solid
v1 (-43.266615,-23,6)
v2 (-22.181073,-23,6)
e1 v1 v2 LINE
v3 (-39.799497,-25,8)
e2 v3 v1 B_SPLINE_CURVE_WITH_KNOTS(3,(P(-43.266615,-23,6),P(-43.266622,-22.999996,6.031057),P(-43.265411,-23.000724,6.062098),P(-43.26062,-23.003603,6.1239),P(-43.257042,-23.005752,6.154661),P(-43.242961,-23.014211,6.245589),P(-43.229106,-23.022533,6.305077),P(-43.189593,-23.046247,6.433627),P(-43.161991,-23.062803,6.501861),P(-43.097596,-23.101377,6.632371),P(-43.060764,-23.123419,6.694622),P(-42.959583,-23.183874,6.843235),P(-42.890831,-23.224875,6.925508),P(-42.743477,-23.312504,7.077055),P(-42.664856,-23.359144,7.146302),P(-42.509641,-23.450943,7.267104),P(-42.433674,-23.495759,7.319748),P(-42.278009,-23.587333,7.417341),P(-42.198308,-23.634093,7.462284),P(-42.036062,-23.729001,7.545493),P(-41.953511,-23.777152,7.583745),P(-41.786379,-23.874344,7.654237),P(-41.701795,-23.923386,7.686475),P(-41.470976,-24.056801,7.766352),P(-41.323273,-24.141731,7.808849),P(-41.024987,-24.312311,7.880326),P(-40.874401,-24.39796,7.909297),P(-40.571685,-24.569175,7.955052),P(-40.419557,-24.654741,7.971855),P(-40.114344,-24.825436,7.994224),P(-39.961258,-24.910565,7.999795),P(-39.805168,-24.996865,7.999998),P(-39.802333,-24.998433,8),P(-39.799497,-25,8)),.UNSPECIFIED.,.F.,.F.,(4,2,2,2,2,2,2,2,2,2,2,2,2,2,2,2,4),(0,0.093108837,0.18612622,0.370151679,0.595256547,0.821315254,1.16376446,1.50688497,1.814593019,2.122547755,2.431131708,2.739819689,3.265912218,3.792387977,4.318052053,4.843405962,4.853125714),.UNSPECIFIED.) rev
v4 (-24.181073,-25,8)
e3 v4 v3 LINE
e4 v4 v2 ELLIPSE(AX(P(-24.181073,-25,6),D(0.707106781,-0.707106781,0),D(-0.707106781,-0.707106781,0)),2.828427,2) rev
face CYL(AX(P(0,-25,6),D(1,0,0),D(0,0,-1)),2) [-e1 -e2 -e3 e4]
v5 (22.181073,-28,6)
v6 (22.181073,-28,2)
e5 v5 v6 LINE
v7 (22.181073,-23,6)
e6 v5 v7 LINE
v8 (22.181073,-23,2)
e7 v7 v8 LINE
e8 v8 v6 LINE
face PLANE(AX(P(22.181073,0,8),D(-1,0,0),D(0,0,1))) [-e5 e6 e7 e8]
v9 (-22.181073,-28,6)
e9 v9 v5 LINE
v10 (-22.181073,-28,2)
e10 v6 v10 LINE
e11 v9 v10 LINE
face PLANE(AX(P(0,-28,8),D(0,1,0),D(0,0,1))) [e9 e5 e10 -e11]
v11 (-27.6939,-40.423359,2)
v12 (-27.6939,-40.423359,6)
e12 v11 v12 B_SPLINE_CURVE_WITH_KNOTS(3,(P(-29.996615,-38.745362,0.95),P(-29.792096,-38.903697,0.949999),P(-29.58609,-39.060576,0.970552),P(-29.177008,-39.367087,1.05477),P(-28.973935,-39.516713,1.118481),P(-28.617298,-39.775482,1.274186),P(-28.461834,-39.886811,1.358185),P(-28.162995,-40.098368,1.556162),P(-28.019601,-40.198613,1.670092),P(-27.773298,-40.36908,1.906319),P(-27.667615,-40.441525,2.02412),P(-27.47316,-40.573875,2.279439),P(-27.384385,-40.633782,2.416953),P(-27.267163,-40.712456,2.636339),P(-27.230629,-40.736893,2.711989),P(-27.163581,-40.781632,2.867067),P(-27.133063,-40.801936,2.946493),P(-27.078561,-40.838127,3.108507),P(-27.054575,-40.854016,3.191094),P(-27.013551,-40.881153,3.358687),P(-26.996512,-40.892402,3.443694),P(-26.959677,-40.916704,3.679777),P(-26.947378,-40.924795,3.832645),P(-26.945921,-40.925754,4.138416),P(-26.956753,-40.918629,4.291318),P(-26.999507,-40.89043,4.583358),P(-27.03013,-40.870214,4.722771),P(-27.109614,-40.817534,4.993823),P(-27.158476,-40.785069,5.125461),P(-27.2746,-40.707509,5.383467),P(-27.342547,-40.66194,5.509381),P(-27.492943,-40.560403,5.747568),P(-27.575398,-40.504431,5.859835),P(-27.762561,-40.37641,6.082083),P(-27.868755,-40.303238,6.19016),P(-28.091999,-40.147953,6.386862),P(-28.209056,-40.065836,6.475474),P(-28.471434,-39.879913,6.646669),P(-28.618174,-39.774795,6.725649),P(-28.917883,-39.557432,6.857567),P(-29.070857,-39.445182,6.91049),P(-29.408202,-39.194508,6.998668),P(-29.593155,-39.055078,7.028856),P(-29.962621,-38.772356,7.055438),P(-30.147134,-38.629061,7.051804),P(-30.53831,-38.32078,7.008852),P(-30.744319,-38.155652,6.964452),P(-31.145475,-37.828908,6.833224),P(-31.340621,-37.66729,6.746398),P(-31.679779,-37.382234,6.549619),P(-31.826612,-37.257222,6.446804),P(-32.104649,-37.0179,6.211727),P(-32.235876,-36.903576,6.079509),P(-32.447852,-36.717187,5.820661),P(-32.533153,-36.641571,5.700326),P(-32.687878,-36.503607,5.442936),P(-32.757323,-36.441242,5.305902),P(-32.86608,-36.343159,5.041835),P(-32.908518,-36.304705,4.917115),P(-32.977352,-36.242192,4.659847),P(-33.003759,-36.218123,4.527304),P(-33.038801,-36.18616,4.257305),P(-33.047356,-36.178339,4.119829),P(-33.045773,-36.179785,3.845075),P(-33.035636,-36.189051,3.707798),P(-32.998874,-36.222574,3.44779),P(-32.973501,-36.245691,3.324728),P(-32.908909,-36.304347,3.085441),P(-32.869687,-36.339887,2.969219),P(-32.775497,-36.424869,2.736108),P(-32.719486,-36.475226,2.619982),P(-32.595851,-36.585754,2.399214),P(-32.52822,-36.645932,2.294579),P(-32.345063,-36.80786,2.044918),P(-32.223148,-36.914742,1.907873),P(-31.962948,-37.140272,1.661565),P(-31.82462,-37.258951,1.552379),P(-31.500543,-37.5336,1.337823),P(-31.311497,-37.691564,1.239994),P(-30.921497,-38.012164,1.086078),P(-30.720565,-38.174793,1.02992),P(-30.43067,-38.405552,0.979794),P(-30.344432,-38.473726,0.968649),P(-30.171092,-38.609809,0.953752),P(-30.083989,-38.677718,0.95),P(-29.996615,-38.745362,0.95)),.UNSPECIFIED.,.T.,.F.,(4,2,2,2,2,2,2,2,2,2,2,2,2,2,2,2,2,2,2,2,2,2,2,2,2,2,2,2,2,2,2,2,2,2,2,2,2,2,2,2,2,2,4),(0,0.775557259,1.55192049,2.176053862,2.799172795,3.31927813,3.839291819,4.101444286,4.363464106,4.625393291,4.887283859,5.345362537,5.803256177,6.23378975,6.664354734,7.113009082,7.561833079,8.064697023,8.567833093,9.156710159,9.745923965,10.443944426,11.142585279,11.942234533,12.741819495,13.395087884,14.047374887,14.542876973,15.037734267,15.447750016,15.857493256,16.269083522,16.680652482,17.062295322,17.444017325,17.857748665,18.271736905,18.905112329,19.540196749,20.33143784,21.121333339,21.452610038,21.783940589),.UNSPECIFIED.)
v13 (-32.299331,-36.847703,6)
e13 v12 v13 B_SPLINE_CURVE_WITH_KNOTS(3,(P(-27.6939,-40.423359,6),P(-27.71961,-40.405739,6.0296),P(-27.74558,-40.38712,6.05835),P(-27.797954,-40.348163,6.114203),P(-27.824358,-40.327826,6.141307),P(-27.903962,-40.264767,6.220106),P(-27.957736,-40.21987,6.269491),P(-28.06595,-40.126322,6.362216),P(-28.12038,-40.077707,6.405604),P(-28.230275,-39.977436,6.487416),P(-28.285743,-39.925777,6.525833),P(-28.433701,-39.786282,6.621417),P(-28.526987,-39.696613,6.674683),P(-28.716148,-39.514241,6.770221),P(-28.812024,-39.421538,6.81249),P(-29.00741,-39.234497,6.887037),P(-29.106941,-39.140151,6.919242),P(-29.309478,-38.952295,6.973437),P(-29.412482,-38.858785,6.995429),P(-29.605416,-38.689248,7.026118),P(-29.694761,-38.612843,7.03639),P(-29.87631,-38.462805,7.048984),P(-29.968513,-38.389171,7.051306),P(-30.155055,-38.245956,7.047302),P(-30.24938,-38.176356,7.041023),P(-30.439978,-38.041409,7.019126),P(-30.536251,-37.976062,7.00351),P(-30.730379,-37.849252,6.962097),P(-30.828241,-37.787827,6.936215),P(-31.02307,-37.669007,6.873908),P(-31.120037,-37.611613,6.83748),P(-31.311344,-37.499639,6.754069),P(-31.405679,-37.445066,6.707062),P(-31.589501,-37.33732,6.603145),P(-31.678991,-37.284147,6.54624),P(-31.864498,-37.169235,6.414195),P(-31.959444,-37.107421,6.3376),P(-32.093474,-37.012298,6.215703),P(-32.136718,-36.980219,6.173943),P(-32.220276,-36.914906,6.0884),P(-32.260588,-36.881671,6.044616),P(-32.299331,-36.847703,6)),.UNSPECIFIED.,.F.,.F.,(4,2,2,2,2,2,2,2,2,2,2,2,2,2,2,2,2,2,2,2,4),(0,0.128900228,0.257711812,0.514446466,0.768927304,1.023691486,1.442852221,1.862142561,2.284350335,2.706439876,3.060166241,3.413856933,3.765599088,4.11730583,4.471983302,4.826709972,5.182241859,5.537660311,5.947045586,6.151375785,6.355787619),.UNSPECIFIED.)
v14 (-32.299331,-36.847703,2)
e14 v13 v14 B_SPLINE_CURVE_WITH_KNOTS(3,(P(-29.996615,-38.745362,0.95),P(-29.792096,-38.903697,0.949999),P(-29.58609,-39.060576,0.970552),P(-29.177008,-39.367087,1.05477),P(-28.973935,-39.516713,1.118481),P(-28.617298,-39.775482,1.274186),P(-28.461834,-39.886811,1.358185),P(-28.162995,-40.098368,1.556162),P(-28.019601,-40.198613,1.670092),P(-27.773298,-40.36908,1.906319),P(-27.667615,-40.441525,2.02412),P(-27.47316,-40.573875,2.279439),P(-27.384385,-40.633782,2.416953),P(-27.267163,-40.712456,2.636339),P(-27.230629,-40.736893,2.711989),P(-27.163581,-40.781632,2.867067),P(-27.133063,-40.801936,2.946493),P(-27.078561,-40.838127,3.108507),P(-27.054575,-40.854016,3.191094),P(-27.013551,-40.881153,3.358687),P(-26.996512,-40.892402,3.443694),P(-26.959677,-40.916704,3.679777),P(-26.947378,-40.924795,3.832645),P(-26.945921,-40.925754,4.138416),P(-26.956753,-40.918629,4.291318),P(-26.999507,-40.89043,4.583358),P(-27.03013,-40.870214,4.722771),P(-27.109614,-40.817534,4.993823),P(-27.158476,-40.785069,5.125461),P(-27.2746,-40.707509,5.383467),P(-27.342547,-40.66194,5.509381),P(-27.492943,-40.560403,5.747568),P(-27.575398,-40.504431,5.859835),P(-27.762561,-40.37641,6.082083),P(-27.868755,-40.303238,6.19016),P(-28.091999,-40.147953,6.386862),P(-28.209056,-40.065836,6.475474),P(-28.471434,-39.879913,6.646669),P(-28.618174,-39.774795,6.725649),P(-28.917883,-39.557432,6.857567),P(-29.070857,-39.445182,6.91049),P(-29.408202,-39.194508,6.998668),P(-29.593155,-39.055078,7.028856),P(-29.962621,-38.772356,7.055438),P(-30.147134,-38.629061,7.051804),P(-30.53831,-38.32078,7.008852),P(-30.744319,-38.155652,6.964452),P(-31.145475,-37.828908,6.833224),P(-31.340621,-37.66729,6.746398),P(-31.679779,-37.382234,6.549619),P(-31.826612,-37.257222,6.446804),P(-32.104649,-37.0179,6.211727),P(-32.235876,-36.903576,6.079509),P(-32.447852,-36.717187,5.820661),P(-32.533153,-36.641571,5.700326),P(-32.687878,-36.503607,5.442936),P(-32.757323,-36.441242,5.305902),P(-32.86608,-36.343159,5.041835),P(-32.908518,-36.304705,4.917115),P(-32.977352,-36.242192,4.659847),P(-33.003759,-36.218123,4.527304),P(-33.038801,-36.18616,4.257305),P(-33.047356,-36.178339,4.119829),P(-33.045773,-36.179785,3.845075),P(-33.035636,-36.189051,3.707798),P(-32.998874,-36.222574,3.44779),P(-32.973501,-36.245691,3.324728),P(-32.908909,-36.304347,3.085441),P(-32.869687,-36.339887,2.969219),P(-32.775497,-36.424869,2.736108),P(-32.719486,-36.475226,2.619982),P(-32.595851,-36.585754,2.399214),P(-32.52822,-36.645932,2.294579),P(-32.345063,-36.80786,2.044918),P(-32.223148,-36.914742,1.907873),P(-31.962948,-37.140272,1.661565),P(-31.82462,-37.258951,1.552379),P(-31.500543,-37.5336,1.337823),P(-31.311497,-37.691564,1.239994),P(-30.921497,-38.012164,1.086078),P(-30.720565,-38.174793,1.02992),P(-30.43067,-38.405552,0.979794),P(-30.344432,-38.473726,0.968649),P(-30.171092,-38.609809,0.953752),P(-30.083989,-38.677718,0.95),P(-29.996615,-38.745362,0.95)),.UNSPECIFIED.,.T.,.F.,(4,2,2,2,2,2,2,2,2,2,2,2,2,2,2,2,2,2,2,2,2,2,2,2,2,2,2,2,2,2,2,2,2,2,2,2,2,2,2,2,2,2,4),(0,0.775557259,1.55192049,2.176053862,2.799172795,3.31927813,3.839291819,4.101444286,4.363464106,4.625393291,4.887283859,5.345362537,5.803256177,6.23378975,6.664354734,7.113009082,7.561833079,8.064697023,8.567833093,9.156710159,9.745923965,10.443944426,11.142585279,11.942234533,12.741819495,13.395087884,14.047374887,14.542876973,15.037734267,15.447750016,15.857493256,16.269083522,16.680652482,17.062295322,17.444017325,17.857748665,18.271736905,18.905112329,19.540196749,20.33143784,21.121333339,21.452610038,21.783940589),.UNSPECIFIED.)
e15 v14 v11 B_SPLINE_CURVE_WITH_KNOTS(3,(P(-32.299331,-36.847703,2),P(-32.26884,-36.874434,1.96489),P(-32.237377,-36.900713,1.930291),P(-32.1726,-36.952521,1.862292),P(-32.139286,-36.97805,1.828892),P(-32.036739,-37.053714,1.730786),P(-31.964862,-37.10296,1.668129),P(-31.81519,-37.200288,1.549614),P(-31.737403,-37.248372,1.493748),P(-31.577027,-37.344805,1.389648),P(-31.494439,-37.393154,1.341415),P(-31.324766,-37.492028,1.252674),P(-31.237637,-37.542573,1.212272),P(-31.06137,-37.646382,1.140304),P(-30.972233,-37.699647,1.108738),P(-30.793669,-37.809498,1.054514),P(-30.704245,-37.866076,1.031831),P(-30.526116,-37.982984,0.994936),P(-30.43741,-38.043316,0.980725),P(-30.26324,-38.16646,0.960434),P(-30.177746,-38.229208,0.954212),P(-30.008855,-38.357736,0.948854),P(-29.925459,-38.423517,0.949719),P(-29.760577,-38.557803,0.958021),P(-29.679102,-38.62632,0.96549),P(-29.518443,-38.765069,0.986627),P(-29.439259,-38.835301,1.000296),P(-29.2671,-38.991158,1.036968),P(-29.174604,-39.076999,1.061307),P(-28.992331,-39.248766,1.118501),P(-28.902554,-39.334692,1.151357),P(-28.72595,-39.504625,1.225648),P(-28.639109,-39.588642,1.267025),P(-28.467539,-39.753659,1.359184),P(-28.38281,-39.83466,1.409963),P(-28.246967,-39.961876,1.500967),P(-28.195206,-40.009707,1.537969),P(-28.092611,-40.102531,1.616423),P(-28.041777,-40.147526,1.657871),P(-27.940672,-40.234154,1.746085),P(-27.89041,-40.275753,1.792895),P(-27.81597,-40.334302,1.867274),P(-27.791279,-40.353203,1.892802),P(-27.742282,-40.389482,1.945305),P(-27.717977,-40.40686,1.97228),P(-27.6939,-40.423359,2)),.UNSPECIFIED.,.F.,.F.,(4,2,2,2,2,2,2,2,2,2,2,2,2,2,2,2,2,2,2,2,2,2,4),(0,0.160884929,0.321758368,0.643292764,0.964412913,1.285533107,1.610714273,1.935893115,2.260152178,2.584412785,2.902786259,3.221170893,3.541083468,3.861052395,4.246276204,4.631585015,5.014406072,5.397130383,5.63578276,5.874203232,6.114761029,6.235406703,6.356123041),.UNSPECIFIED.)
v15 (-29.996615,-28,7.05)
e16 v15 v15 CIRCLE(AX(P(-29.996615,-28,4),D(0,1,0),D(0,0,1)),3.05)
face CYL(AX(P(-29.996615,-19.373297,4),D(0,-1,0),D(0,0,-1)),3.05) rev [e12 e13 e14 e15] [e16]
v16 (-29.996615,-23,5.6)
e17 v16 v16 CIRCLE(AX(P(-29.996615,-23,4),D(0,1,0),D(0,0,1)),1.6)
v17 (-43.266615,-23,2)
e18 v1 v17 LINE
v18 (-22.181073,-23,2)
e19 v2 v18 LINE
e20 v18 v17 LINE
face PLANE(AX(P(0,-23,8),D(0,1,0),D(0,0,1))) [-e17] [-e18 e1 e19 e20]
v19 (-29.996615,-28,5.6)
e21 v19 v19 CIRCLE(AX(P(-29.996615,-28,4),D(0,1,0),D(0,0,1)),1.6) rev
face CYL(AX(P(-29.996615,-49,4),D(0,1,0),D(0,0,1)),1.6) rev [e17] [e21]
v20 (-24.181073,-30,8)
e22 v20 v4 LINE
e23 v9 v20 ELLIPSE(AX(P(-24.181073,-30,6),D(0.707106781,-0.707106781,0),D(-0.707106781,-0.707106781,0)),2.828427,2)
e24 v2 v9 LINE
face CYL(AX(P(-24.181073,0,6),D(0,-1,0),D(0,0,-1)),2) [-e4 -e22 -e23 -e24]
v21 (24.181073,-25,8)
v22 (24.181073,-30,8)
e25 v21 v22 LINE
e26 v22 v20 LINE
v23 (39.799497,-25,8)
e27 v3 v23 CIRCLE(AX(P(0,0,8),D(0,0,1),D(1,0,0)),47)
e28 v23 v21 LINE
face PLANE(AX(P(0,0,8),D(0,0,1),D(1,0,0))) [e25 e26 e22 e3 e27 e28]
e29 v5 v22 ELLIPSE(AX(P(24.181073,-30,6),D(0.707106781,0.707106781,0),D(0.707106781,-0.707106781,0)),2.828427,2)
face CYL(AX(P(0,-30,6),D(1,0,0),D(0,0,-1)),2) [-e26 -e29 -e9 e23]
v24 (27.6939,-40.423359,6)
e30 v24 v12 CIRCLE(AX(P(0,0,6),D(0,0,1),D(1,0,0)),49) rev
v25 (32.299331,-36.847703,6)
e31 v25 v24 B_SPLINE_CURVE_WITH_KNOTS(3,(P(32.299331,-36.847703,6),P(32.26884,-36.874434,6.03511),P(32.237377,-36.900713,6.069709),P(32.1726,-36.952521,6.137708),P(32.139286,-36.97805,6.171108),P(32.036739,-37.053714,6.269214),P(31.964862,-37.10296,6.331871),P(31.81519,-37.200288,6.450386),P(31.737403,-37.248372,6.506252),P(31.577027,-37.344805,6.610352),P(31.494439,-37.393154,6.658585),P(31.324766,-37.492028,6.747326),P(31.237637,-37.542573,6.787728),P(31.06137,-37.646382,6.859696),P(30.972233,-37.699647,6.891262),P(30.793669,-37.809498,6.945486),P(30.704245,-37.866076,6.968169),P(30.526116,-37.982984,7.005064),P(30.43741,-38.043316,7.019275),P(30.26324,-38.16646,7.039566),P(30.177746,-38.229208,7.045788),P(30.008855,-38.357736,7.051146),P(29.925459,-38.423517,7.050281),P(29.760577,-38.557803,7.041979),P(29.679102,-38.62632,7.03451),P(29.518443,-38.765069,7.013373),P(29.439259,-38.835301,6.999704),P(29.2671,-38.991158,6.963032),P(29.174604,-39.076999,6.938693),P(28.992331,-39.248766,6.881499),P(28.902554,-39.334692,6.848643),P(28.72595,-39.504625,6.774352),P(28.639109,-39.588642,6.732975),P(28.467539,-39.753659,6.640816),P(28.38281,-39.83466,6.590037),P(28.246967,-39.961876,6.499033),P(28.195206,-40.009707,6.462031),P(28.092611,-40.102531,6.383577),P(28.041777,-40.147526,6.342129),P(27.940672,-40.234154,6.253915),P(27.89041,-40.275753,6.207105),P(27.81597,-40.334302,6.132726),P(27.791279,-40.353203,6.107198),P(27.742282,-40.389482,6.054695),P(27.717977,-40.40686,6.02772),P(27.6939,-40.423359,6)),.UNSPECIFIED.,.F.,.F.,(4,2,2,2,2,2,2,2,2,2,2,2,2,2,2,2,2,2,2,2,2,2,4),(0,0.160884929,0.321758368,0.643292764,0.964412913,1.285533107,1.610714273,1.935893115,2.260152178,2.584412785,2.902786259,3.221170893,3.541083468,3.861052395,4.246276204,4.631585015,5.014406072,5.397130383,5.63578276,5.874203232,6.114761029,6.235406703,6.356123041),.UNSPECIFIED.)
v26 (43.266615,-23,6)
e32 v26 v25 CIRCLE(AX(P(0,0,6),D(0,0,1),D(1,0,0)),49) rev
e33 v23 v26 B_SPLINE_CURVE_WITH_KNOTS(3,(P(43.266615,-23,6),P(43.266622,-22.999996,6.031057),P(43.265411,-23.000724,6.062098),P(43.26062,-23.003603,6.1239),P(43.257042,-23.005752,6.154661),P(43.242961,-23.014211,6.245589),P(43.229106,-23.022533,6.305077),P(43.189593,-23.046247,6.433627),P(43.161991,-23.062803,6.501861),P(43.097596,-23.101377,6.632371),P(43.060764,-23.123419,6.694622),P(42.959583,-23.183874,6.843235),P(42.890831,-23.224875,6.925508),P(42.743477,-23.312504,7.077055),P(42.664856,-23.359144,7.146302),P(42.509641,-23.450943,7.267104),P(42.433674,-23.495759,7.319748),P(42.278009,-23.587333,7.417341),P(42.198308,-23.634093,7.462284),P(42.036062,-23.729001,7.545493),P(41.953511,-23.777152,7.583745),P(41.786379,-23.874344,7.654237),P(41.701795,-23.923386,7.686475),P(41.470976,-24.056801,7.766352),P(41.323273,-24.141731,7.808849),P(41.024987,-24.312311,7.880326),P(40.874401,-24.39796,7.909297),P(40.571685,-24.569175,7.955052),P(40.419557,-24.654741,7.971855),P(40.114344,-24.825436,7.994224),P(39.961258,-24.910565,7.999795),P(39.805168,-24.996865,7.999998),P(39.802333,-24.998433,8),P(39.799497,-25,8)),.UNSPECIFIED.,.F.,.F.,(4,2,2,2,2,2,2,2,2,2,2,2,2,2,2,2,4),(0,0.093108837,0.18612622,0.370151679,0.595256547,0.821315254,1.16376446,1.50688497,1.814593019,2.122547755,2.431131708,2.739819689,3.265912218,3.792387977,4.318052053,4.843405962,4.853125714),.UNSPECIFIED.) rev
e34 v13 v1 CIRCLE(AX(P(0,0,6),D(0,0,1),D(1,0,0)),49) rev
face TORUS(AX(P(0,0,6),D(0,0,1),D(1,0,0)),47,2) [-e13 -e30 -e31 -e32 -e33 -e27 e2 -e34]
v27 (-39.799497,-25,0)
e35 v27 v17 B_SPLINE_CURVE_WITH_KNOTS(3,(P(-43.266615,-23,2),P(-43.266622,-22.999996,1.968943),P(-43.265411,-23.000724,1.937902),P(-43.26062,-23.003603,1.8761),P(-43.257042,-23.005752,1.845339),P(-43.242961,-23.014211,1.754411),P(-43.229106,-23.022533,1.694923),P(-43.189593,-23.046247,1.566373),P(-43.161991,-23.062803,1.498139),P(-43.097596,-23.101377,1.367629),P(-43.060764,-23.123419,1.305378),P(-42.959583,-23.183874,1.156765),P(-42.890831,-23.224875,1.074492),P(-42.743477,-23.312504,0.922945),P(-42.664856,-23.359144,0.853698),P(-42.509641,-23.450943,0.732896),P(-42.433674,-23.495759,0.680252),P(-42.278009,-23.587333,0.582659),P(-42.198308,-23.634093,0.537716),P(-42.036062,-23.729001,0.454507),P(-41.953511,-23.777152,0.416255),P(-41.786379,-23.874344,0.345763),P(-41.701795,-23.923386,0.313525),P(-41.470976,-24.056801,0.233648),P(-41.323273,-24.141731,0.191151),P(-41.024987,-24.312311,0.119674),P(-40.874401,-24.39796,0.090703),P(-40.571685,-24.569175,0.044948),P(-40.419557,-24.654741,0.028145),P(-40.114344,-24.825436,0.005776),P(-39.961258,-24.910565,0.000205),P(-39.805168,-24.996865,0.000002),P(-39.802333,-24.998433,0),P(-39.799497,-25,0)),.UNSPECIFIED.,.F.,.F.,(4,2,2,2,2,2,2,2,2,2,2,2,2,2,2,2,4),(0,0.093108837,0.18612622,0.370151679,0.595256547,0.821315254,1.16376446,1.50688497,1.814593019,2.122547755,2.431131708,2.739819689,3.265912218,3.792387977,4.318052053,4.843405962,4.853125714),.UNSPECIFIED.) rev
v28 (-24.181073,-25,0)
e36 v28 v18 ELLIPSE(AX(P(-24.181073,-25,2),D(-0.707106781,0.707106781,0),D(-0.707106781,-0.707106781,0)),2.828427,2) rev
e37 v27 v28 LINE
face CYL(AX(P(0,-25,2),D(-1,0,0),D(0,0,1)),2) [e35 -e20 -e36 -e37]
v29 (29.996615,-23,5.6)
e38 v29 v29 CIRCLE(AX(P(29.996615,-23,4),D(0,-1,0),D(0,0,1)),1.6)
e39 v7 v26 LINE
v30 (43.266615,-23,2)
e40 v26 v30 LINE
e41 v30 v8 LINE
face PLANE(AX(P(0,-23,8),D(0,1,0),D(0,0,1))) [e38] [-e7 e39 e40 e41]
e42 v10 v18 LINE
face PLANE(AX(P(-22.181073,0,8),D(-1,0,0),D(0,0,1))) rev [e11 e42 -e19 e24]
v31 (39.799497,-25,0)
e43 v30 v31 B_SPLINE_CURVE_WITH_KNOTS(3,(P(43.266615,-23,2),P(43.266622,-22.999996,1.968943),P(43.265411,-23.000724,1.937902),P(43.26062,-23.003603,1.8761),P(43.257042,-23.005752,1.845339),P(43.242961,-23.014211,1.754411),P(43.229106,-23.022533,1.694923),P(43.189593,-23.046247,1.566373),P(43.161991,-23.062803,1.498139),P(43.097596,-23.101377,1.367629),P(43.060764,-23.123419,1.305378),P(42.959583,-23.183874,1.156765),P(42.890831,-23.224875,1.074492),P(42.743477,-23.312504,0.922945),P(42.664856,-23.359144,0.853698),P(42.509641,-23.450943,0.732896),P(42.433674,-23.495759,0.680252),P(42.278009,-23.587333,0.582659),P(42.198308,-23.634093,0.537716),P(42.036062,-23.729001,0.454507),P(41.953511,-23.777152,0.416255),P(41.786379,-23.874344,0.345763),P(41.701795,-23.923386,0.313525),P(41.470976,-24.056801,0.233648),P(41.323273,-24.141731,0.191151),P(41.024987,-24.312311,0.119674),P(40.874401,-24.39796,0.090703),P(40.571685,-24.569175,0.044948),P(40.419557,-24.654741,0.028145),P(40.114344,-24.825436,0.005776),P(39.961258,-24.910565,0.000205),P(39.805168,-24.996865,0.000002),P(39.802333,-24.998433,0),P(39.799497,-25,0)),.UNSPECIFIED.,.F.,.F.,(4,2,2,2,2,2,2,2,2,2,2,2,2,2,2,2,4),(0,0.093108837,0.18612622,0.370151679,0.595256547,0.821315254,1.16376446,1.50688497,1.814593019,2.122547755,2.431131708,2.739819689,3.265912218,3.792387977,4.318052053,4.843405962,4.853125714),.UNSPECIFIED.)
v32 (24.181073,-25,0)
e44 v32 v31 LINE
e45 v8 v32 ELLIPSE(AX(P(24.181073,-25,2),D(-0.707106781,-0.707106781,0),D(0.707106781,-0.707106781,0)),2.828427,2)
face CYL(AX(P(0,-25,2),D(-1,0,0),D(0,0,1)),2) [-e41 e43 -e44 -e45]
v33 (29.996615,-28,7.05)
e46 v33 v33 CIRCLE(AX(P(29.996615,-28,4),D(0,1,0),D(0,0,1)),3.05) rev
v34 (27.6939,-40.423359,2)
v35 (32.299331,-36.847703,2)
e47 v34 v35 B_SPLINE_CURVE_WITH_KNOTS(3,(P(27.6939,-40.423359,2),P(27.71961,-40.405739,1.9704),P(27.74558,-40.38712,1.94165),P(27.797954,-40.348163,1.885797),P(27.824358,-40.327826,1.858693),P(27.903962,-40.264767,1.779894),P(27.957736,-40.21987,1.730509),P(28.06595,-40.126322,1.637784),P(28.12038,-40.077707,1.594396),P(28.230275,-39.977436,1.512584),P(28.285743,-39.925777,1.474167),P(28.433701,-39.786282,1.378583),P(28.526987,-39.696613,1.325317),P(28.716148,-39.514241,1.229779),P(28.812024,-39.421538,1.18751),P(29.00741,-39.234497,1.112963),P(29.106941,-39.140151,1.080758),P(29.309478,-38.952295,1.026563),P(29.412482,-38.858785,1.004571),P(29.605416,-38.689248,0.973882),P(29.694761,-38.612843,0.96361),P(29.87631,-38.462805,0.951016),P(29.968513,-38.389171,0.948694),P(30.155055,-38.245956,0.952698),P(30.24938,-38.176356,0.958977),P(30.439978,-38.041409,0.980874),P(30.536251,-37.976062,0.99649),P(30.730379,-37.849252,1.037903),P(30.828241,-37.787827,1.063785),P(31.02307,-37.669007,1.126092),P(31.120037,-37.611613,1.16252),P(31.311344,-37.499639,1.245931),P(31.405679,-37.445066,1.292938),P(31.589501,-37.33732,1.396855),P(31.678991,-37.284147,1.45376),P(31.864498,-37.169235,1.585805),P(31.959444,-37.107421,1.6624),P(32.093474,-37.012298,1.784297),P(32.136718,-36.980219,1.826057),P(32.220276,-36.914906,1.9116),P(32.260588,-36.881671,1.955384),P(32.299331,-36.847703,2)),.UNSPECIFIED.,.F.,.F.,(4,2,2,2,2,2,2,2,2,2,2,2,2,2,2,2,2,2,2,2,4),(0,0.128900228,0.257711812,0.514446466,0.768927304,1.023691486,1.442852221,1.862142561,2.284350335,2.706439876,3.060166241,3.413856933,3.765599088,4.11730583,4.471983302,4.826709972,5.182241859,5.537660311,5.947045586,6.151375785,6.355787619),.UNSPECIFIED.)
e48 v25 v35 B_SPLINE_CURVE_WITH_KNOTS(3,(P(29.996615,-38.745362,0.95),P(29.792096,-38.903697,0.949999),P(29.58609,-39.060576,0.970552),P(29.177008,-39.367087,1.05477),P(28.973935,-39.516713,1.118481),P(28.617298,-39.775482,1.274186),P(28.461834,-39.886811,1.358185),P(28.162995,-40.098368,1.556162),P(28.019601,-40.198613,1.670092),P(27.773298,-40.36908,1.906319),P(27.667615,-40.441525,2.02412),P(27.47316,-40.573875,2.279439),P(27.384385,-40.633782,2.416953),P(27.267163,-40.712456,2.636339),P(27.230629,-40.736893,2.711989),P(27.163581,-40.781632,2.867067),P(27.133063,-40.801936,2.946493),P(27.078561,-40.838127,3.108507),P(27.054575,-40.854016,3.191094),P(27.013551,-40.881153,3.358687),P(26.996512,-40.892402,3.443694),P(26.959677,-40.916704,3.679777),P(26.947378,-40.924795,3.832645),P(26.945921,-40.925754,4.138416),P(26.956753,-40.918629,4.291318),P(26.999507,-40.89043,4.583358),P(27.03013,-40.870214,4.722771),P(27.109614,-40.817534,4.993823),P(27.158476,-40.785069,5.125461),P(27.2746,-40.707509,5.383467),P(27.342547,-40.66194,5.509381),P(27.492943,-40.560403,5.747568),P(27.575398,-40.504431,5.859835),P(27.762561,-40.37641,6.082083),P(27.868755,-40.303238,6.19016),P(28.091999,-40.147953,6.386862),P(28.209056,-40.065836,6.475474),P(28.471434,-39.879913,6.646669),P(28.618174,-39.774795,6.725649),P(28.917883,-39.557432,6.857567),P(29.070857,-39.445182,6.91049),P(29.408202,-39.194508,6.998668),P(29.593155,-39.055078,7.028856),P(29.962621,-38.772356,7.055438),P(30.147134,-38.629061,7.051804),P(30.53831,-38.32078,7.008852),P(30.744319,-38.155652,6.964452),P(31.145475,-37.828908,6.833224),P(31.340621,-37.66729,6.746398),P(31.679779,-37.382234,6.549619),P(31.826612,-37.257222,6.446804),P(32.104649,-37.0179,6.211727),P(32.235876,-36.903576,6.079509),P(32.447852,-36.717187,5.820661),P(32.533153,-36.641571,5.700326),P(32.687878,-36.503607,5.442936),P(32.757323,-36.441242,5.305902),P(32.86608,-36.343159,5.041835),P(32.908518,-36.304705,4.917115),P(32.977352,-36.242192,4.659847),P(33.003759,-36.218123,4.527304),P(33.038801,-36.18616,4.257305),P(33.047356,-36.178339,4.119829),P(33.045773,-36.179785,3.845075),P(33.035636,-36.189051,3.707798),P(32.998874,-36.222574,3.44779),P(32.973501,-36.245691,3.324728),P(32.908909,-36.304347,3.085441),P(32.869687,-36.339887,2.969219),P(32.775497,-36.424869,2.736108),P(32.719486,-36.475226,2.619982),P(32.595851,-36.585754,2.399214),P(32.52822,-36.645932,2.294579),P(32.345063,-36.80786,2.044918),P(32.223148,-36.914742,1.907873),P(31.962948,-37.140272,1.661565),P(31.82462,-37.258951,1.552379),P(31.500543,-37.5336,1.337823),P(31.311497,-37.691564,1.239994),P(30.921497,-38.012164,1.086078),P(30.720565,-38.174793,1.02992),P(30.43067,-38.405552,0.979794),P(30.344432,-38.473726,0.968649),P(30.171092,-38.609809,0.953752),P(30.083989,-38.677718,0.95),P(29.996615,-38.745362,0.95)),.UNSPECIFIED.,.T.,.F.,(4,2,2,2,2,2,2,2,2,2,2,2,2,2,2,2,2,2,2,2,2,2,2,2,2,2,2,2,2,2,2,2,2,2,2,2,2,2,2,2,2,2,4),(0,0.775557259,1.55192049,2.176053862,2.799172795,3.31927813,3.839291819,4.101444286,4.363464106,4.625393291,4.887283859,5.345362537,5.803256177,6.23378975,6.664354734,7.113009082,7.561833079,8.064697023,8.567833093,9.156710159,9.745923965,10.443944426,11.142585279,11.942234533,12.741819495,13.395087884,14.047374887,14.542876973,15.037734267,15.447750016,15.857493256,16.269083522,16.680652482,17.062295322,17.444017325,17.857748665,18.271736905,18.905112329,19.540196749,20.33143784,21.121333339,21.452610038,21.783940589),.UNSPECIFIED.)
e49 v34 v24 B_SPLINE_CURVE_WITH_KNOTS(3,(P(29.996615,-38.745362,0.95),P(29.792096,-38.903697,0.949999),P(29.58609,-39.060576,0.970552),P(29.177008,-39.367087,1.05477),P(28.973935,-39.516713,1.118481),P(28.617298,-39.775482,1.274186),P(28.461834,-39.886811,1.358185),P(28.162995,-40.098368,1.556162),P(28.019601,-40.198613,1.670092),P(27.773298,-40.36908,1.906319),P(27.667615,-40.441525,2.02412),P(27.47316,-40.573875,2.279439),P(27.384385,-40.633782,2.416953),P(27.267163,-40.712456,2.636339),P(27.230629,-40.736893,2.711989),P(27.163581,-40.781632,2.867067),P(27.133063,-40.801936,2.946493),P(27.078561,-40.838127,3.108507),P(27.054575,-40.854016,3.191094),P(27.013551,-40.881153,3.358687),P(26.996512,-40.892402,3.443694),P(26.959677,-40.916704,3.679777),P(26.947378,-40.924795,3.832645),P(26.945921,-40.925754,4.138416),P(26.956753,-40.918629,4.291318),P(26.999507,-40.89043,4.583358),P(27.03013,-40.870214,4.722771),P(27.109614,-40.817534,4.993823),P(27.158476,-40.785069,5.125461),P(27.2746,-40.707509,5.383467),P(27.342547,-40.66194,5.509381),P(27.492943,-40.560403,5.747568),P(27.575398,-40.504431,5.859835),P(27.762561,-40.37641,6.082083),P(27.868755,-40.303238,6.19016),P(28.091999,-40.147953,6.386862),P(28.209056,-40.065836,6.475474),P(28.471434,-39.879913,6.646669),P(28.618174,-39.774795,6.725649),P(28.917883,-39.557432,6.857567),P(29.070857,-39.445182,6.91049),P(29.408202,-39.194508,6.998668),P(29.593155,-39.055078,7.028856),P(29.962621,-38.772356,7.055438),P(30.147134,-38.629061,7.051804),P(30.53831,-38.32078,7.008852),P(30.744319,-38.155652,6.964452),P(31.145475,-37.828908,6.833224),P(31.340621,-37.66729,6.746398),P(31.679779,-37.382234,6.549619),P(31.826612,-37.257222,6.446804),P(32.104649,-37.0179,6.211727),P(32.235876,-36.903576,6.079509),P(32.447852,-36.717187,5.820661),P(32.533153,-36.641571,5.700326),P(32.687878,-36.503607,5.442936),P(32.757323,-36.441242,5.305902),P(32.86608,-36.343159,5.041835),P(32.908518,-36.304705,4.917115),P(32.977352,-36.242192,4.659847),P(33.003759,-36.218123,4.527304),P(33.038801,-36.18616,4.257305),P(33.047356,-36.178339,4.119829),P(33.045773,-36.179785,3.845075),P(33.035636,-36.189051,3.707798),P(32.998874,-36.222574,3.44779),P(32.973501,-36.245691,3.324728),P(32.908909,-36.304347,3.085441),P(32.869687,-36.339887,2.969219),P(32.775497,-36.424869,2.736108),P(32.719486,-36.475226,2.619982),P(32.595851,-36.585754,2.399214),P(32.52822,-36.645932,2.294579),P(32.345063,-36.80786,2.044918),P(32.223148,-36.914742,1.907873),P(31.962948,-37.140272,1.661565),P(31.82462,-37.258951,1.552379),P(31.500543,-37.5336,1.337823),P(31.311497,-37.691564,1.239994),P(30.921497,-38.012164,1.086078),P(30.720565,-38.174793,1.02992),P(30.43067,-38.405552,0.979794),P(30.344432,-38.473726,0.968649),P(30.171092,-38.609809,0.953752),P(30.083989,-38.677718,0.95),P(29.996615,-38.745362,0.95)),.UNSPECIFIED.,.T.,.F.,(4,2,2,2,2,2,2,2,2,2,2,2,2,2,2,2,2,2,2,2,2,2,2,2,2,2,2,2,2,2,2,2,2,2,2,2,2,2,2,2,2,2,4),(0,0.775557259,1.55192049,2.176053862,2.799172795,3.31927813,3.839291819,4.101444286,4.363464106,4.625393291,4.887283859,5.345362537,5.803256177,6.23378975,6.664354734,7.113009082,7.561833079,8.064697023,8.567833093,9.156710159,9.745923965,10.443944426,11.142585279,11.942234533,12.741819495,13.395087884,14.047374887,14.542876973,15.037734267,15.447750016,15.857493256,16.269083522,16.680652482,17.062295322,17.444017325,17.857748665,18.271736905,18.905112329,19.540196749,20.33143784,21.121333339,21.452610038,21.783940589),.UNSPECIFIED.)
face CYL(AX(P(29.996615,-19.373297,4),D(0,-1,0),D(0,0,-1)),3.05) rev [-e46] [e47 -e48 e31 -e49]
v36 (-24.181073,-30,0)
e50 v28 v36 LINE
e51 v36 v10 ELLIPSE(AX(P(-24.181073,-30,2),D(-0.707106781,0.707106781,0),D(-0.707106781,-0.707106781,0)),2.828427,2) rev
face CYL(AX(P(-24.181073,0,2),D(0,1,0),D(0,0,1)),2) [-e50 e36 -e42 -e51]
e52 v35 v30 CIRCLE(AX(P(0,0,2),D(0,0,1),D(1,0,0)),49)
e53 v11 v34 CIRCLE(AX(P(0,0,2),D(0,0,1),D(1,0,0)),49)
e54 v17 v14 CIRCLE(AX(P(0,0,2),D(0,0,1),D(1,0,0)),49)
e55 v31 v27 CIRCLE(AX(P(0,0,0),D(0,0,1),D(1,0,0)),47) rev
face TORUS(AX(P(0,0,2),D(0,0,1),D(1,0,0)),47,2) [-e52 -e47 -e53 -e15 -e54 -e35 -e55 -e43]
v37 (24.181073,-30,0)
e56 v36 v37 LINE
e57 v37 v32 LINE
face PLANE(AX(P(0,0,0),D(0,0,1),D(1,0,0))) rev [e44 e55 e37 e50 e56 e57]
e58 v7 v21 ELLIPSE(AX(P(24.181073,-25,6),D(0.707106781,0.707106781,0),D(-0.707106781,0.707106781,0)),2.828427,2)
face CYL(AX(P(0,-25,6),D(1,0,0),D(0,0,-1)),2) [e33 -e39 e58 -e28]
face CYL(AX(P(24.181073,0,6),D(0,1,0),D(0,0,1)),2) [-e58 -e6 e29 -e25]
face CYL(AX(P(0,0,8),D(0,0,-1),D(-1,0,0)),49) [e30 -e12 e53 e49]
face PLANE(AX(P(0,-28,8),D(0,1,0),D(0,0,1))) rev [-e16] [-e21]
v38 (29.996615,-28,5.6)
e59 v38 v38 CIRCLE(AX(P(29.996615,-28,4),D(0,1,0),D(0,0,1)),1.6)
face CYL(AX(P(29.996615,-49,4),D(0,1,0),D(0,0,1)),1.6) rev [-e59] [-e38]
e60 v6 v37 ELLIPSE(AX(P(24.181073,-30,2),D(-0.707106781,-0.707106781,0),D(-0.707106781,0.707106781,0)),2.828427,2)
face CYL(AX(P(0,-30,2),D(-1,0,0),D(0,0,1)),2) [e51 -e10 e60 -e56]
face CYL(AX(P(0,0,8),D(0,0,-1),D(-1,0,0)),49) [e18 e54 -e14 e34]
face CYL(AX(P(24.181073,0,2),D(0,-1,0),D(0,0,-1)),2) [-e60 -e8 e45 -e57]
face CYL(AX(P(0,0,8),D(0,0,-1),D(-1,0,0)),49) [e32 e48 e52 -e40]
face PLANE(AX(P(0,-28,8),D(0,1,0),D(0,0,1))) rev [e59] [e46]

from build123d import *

# Parameters (mm, degrees)
SKETCH1_W           = 44.362146026
SKETCH1_H           = 10
BOSS_EXTRUDE1_DEPTH = 8
SKETCH2_R           = 1.6
CUT_EXTRUDE1_DEPTH  = 52.107729357
CUT_EXTRUDE2_START  = -17.925297
SKETCH3_R           = 3.05
CUT_EXTRUDE2_DEPTH  = 12.925297
FILLET1_R           = 2


with BuildPart() as part:
    # Sketch1 → Boss-Extrude1 (new body)
    with BuildSketch(Plane.XY):
        with BuildLine():
            Line((-29.953929645, -23), (-37.509998667, -23))
            ThreePointArc((-37.509998667, -23), (-35.812927639, -25.562359318), (-33.941125497, -28))
            Line((-33.941125497, -28), (-22.181073013, -28))
            Line((-22.181073013, -28), (-22.181073013, -23))
            Line((-22.181073013, -23), (-29.953929645, -23))
        make_face()
        with BuildLine():
            Line((-37.509998667, -23), (-43.266615306, -23))
            ThreePointArc((-43.266615306, -23), (0, -49), (43.266615306, -23))
            Line((43.266615306, -23), (37.509998667, -23))
            ThreePointArc((37.509998667, -23), (35.812927639, -25.562359318), (33.941125497, -28))
            ThreePointArc((33.941125497, -28), (28.503075122, -33.519765939), (22.181073013, -38))
            ThreePointArc((22.181073013, -38), (0, -44), (-22.181073013, -38))
            ThreePointArc((-22.181073013, -38), (-28.503075122, -33.519765939), (-33.941125497, -28))
            ThreePointArc((-33.941125497, -28), (-35.812927639, -25.562359318), (-37.509998667, -23))
        make_face()
        with BuildLine():
            Line((-22.181073013, -28), (-33.941125497, -28))
            ThreePointArc((-33.941125497, -28), (-28.503075122, -33.519765939), (-22.181073013, -38))
            Line((-22.181073013, -38), (-22.181073013, -28))
        make_face()
        with BuildLine():
            ThreePointArc((22.181073013, -38), (28.503075122, -33.519765939), (33.941125497, -28))
            Line((33.941125497, -28), (22.181073013, -28))
            Line((22.181073013, -28), (22.181073013, -38))
        make_face()
        with BuildLine():
            ThreePointArc((33.941125497, -28), (35.812927639, -25.562359318), (37.509998667, -23))
            Line((37.509998667, -23), (22.181073013, -23))
            Line((22.181073013, -23), (22.181073013, -28))
            Line((22.181073013, -28), (33.941125497, -28))
        make_face()
        with Locations((0, -33)):
            Rectangle(SKETCH1_W, SKETCH1_H)
        with BuildLine():
            Line((22.181073013, -38), (-22.181073013, -38))
            ThreePointArc((-22.181073013, -38), (0, -44), (22.181073013, -38))
        make_face()
    extrude(amount=BOSS_EXTRUDE1_DEPTH)

    # Sketch2 → Cut-Extrude1 (cut, through all)
    with BuildSketch(Plane(origin=(0, -23, 0), x_dir=(1, 0, 0), z_dir=(0, 1, 0))):
        with Locations(Location((-29.996615306, -4, 0), (0, 0, 270))):
            Circle(SKETCH2_R)
    cut_extrude1 = extrude(amount=-CUT_EXTRUDE1_DEPTH, mode=Mode.SUBTRACT)

    # Sketch3 → Cut-Extrude2 (cut)
    with BuildSketch(Plane(origin=(0, -23, 0), x_dir=(1, 0, 0), z_dir=(0, 1, 0)).offset(CUT_EXTRUDE2_START)):
        with Locations(Location((-29.996615306, -4, 0), (0, 0, 90))):
            Circle(SKETCH3_R)
    cut_extrude2 = extrude(amount=CUT_EXTRUDE2_DEPTH, mode=Mode.SUBTRACT)

    # Mirror1: Cut-Extrude1, Cut-Extrude2 across plane
    add(cut_extrude1.mirror(Plane(origin=(0, 0, 0), x_dir=(0, 0, 1), z_dir=(1, 0, 0))), mode=Mode.SUBTRACT)
    add(cut_extrude2.mirror(Plane(origin=(0, 0, 0), x_dir=(0, 0, 1), z_dir=(1, 0, 0))), mode=Mode.SUBTRACT)

    # Fillet1
    # the kernel refuses this fillet: 2 mm, written as the material it takes off along each edge
    with BuildSketch(Plane(origin=(22.181073013, -28, 8), x_dir=(0, -1, 0), z_dir=(-1, 0, 0))) as fillet1_piece_1:
        with BuildLine():
            CenterArc((FILLET1_R, -FILLET1_R), FILLET1_R, 90, 90)
            Line((0, -FILLET1_R), (0, 0))
            Line((0, 0), (FILLET1_R, 0))
        make_face()
    extrude(amount=44.362146026, mode=Mode.SUBTRACT)
    with BuildSketch(Plane(origin=(22.181073013, -28, 0), x_dir=(0, -1, 0), z_dir=(-1, 0, 0))) as fillet1_piece_2:
        with BuildLine():
            CenterArc((FILLET1_R, FILLET1_R), FILLET1_R, 180, 90)
            Line((0, FILLET1_R), (0, 0))
            Line((0, 0), (FILLET1_R, 0))
        make_face()
    extrude(amount=44.362146026, mode=Mode.SUBTRACT)
    with BuildSketch(Plane(origin=(22.181073013, -18, 0), x_dir=(1, 0, 0), z_dir=(0, -1, 0))) as fillet1_piece_3:
        with BuildLine():
            CenterArc((FILLET1_R, FILLET1_R), FILLET1_R, 180, 90)
            Line((0, FILLET1_R), (0, 0))
            Line((0, 0), (FILLET1_R, 0))
        make_face()
    extrude(amount=10, mode=Mode.SUBTRACT)
    with BuildSketch(Plane(origin=(-22.181073013, -28, 8), x_dir=(-1, 0, 0), z_dir=(0, 1, 0)), Plane(origin=(22.181073013, -18, 8), x_dir=(1, 0, 0), z_dir=(0, -1, 0)), Plane(origin=(-22.181073013, -28, 0), x_dir=(0, 0, 1), z_dir=(0, 1, 0))) as fillet1_piece_4:
        with BuildLine():
            CenterArc((FILLET1_R, -FILLET1_R), FILLET1_R, 90, 90)
            Line((0, -FILLET1_R), (0, 0))
            Line((0, 0), (FILLET1_R, 0))
        make_face()
    extrude(amount=10, mode=Mode.SUBTRACT)
    with BuildSketch(Plane(origin=(-17.181073013, -23, 8), x_dir=(0, -1, 0), z_dir=(-1, 0, 0)), Plane(origin=(48.266615306, -23, 8), x_dir=(0, -1, 0), z_dir=(-1, 0, 0)), Plane(origin=(-48.266615306, -23, 0), x_dir=(0, -1, 0), z_dir=(1, 0, 0))) as fillet1_piece_5:
        with BuildLine():
            CenterArc((FILLET1_R, -FILLET1_R), FILLET1_R, 90, 90)
            Line((0, -FILLET1_R), (0, 0))
            Line((0, 0), (FILLET1_R, 0))
        make_face()
    extrude(amount=31.085542293, mode=Mode.SUBTRACT)
    with BuildSketch(Plane(origin=(0, 0, 8), x_dir=(-0.9262421127905929, -0.3769291027411106, 0), z_dir=(-0.3769291027411106, 0.9262421127905929, 0))) as fillet1_piece_6:
        with BuildLine():
            CenterArc((49 - FILLET1_R, -FILLET1_R), FILLET1_R, 0, 90)
            Line((49, -FILLET1_R), (49, 0))
            Line((49, 0), (49 - FILLET1_R, 0))
        make_face()
    revolve(axis=Axis((0, 0, 8), (0, 0, 1)), revolution_arc=135.712813104, mode=Mode.SUBTRACT)
    with BuildSketch(Plane(origin=(48.266615306, -23, 0), x_dir=(0, -1, 0), z_dir=(-1, 0, 0))) as fillet1_piece_7:
        with BuildLine():
            CenterArc((FILLET1_R, FILLET1_R), FILLET1_R, 180, 90)
            Line((0, FILLET1_R), (0, 0))
            Line((0, 0), (FILLET1_R, 0))
        make_face()
    extrude(amount=31.085542293, mode=Mode.SUBTRACT)
    with BuildSketch(Plane(origin=(0, 0, 0), x_dir=(-0.9262421127905929, -0.3769291027411106, 0), z_dir=(-0.3769291027411106, 0.9262421127905929, 0))) as fillet1_piece_8:
        with BuildLine():
            CenterArc((49 - FILLET1_R, FILLET1_R), FILLET1_R, 270, 90)
            Line((49, FILLET1_R), (49, 0))
            Line((49, 0), (49 - FILLET1_R, 0))
        make_face()
    revolve(axis=Axis((0, 0, 0), (0, 0, 1)), revolution_arc=135.712813104, mode=Mode.SUBTRACT)
    with BuildSketch(Plane(origin=(22.181073013, -18, 8), x_dir=(1, 0, 0), z_dir=(0, -1, 0))) as fillet1_piece_9a_section:
        with BuildLine():
            CenterArc((FILLET1_R, -FILLET1_R), FILLET1_R, 90, 90)
            Line((0, -FILLET1_R), (0, 0))
            Line((0, 0), (FILLET1_R, 0))
        make_face()
    fillet1_piece_9a = extrude(amount=15, mode=Mode.PRIVATE)
    fillet1_piece_9a = split(fillet1_piece_9a, bisect_by=Plane(origin=(22.633863241, -28, 7.547209771), z_dir=(0, -1, 0)), keep=Keep.TOP, mode=Mode.PRIVATE)
    with BuildSketch(Plane(origin=(27.181073013, -28, 8), x_dir=(0, -1, 0), z_dir=(-1, 0, 0))) as fillet1_piece_9b_section:
        with BuildLine():
            CenterArc((FILLET1_R, -FILLET1_R), FILLET1_R, 90, 90)
            Line((0, -FILLET1_R), (0, 0))
            Line((0, 0), (FILLET1_R, 0))
        make_face()
    fillet1_piece_9b = extrude(amount=49.362146026, mode=Mode.PRIVATE)
    fillet1_piece_9b = split(fillet1_piece_9b, bisect_by=Plane(origin=(22.181073013, -28.452790229, 7.547209771), z_dir=(1, 0, 0)), keep=Keep.TOP, mode=Mode.PRIVATE)
    fillet1_piece_9 = fillet1_piece_9a & fillet1_piece_9b
    add(fillet1_piece_9, mode=Mode.SUBTRACT)
    with BuildSketch(Plane(origin=(22.181073013, -28, 8), x_dir=(0, -1, 0), z_dir=(-1, 0, 0))) as fillet1_piece_10a_section:
        with BuildLine():
            CenterArc((FILLET1_R, -FILLET1_R), FILLET1_R, 90, 90)
            Line((0, -FILLET1_R), (0, 0))
            Line((0, 0), (FILLET1_R, 0))
        make_face()
    fillet1_piece_10a = extrude(amount=49.362146026, mode=Mode.PRIVATE)
    fillet1_piece_10a = split(fillet1_piece_10a, bisect_by=Plane(origin=(-22.181073013, -28.452790229, 7.547209771), z_dir=(-1, 0, 0)), keep=Keep.TOP, mode=Mode.PRIVATE)
    with BuildSketch(Plane(origin=(-22.181073013, -33, 8), x_dir=(-1, 0, 0), z_dir=(0, 1, 0))) as fillet1_piece_10b_section:
        with BuildLine():
            CenterArc((FILLET1_R, -FILLET1_R), FILLET1_R, 90, 90)
            Line((0, -FILLET1_R), (0, 0))
            Line((0, 0), (FILLET1_R, 0))
        make_face()
    fillet1_piece_10b = extrude(amount=15, mode=Mode.PRIVATE)
    fillet1_piece_10b = split(fillet1_piece_10b, bisect_by=Plane(origin=(-22.633863241, -28, 7.547209771), z_dir=(0, -1, 0)), keep=Keep.TOP, mode=Mode.PRIVATE)
    fillet1_piece_10 = fillet1_piece_10a & fillet1_piece_10b
    add(fillet1_piece_10, mode=Mode.SUBTRACT)
    with BuildSketch(Plane(origin=(22.181073013, -18, 0), x_dir=(1, 0, 0), z_dir=(0, -1, 0))) as fillet1_piece_11a_section:
        with BuildLine():
            CenterArc((FILLET1_R, FILLET1_R), FILLET1_R, 180, 90)
            Line((0, FILLET1_R), (0, 0))
            Line((0, 0), (FILLET1_R, 0))
        make_face()
    fillet1_piece_11a = extrude(amount=15, mode=Mode.PRIVATE)
    fillet1_piece_11a = split(fillet1_piece_11a, bisect_by=Plane(origin=(22.633863241, -28, 0.452790229), z_dir=(0, -1, 0)), keep=Keep.TOP, mode=Mode.PRIVATE)
    with BuildSketch(Plane(origin=(27.181073013, -28, 0), x_dir=(0, -1, 0), z_dir=(-1, 0, 0))) as fillet1_piece_11b_section:
        with BuildLine():
            CenterArc((FILLET1_R, FILLET1_R), FILLET1_R, 180, 90)
            Line((0, FILLET1_R), (0, 0))
            Line((0, 0), (FILLET1_R, 0))
        make_face()
    fillet1_piece_11b = extrude(amount=49.362146026, mode=Mode.PRIVATE)
    fillet1_piece_11b = split(fillet1_piece_11b, bisect_by=Plane(origin=(22.181073013, -28.452790229, 0.452790229), z_dir=(1, 0, 0)), keep=Keep.TOP, mode=Mode.PRIVATE)
    fillet1_piece_11 = fillet1_piece_11a & fillet1_piece_11b
    add(fillet1_piece_11, mode=Mode.SUBTRACT)
    with BuildSketch(Plane(origin=(-22.181073013, -33, 0), x_dir=(0, 0, 1), z_dir=(0, 1, 0))) as fillet1_piece_12a_section:
        with BuildLine():
            CenterArc((FILLET1_R, -FILLET1_R), FILLET1_R, 90, 90)
            Line((0, -FILLET1_R), (0, 0))
            Line((0, 0), (FILLET1_R, 0))
        make_face()
    fillet1_piece_12a = extrude(amount=15, mode=Mode.PRIVATE)
    fillet1_piece_12a = split(fillet1_piece_12a, bisect_by=Plane(origin=(-22.633863241, -28, 0.452790229), z_dir=(0, -1, 0)), keep=Keep.TOP, mode=Mode.PRIVATE)
    with BuildSketch(Plane(origin=(22.181073013, -28, 0), x_dir=(0, -1, 0), z_dir=(-1, 0, 0))) as fillet1_piece_12b_section:
        with BuildLine():
            CenterArc((FILLET1_R, FILLET1_R), FILLET1_R, 180, 90)
            Line((0, FILLET1_R), (0, 0))
            Line((0, 0), (FILLET1_R, 0))
        make_face()
    fillet1_piece_12b = extrude(amount=49.362146026, mode=Mode.PRIVATE)
    fillet1_piece_12b = split(fillet1_piece_12b, bisect_by=Plane(origin=(-22.181073013, -28.452790229, 0.452790229), z_dir=(-1, 0, 0)), keep=Keep.TOP, mode=Mode.PRIVATE)
    fillet1_piece_12 = fillet1_piece_12a & fillet1_piece_12b
    add(fillet1_piece_12, mode=Mode.SUBTRACT)


solid = part.part
